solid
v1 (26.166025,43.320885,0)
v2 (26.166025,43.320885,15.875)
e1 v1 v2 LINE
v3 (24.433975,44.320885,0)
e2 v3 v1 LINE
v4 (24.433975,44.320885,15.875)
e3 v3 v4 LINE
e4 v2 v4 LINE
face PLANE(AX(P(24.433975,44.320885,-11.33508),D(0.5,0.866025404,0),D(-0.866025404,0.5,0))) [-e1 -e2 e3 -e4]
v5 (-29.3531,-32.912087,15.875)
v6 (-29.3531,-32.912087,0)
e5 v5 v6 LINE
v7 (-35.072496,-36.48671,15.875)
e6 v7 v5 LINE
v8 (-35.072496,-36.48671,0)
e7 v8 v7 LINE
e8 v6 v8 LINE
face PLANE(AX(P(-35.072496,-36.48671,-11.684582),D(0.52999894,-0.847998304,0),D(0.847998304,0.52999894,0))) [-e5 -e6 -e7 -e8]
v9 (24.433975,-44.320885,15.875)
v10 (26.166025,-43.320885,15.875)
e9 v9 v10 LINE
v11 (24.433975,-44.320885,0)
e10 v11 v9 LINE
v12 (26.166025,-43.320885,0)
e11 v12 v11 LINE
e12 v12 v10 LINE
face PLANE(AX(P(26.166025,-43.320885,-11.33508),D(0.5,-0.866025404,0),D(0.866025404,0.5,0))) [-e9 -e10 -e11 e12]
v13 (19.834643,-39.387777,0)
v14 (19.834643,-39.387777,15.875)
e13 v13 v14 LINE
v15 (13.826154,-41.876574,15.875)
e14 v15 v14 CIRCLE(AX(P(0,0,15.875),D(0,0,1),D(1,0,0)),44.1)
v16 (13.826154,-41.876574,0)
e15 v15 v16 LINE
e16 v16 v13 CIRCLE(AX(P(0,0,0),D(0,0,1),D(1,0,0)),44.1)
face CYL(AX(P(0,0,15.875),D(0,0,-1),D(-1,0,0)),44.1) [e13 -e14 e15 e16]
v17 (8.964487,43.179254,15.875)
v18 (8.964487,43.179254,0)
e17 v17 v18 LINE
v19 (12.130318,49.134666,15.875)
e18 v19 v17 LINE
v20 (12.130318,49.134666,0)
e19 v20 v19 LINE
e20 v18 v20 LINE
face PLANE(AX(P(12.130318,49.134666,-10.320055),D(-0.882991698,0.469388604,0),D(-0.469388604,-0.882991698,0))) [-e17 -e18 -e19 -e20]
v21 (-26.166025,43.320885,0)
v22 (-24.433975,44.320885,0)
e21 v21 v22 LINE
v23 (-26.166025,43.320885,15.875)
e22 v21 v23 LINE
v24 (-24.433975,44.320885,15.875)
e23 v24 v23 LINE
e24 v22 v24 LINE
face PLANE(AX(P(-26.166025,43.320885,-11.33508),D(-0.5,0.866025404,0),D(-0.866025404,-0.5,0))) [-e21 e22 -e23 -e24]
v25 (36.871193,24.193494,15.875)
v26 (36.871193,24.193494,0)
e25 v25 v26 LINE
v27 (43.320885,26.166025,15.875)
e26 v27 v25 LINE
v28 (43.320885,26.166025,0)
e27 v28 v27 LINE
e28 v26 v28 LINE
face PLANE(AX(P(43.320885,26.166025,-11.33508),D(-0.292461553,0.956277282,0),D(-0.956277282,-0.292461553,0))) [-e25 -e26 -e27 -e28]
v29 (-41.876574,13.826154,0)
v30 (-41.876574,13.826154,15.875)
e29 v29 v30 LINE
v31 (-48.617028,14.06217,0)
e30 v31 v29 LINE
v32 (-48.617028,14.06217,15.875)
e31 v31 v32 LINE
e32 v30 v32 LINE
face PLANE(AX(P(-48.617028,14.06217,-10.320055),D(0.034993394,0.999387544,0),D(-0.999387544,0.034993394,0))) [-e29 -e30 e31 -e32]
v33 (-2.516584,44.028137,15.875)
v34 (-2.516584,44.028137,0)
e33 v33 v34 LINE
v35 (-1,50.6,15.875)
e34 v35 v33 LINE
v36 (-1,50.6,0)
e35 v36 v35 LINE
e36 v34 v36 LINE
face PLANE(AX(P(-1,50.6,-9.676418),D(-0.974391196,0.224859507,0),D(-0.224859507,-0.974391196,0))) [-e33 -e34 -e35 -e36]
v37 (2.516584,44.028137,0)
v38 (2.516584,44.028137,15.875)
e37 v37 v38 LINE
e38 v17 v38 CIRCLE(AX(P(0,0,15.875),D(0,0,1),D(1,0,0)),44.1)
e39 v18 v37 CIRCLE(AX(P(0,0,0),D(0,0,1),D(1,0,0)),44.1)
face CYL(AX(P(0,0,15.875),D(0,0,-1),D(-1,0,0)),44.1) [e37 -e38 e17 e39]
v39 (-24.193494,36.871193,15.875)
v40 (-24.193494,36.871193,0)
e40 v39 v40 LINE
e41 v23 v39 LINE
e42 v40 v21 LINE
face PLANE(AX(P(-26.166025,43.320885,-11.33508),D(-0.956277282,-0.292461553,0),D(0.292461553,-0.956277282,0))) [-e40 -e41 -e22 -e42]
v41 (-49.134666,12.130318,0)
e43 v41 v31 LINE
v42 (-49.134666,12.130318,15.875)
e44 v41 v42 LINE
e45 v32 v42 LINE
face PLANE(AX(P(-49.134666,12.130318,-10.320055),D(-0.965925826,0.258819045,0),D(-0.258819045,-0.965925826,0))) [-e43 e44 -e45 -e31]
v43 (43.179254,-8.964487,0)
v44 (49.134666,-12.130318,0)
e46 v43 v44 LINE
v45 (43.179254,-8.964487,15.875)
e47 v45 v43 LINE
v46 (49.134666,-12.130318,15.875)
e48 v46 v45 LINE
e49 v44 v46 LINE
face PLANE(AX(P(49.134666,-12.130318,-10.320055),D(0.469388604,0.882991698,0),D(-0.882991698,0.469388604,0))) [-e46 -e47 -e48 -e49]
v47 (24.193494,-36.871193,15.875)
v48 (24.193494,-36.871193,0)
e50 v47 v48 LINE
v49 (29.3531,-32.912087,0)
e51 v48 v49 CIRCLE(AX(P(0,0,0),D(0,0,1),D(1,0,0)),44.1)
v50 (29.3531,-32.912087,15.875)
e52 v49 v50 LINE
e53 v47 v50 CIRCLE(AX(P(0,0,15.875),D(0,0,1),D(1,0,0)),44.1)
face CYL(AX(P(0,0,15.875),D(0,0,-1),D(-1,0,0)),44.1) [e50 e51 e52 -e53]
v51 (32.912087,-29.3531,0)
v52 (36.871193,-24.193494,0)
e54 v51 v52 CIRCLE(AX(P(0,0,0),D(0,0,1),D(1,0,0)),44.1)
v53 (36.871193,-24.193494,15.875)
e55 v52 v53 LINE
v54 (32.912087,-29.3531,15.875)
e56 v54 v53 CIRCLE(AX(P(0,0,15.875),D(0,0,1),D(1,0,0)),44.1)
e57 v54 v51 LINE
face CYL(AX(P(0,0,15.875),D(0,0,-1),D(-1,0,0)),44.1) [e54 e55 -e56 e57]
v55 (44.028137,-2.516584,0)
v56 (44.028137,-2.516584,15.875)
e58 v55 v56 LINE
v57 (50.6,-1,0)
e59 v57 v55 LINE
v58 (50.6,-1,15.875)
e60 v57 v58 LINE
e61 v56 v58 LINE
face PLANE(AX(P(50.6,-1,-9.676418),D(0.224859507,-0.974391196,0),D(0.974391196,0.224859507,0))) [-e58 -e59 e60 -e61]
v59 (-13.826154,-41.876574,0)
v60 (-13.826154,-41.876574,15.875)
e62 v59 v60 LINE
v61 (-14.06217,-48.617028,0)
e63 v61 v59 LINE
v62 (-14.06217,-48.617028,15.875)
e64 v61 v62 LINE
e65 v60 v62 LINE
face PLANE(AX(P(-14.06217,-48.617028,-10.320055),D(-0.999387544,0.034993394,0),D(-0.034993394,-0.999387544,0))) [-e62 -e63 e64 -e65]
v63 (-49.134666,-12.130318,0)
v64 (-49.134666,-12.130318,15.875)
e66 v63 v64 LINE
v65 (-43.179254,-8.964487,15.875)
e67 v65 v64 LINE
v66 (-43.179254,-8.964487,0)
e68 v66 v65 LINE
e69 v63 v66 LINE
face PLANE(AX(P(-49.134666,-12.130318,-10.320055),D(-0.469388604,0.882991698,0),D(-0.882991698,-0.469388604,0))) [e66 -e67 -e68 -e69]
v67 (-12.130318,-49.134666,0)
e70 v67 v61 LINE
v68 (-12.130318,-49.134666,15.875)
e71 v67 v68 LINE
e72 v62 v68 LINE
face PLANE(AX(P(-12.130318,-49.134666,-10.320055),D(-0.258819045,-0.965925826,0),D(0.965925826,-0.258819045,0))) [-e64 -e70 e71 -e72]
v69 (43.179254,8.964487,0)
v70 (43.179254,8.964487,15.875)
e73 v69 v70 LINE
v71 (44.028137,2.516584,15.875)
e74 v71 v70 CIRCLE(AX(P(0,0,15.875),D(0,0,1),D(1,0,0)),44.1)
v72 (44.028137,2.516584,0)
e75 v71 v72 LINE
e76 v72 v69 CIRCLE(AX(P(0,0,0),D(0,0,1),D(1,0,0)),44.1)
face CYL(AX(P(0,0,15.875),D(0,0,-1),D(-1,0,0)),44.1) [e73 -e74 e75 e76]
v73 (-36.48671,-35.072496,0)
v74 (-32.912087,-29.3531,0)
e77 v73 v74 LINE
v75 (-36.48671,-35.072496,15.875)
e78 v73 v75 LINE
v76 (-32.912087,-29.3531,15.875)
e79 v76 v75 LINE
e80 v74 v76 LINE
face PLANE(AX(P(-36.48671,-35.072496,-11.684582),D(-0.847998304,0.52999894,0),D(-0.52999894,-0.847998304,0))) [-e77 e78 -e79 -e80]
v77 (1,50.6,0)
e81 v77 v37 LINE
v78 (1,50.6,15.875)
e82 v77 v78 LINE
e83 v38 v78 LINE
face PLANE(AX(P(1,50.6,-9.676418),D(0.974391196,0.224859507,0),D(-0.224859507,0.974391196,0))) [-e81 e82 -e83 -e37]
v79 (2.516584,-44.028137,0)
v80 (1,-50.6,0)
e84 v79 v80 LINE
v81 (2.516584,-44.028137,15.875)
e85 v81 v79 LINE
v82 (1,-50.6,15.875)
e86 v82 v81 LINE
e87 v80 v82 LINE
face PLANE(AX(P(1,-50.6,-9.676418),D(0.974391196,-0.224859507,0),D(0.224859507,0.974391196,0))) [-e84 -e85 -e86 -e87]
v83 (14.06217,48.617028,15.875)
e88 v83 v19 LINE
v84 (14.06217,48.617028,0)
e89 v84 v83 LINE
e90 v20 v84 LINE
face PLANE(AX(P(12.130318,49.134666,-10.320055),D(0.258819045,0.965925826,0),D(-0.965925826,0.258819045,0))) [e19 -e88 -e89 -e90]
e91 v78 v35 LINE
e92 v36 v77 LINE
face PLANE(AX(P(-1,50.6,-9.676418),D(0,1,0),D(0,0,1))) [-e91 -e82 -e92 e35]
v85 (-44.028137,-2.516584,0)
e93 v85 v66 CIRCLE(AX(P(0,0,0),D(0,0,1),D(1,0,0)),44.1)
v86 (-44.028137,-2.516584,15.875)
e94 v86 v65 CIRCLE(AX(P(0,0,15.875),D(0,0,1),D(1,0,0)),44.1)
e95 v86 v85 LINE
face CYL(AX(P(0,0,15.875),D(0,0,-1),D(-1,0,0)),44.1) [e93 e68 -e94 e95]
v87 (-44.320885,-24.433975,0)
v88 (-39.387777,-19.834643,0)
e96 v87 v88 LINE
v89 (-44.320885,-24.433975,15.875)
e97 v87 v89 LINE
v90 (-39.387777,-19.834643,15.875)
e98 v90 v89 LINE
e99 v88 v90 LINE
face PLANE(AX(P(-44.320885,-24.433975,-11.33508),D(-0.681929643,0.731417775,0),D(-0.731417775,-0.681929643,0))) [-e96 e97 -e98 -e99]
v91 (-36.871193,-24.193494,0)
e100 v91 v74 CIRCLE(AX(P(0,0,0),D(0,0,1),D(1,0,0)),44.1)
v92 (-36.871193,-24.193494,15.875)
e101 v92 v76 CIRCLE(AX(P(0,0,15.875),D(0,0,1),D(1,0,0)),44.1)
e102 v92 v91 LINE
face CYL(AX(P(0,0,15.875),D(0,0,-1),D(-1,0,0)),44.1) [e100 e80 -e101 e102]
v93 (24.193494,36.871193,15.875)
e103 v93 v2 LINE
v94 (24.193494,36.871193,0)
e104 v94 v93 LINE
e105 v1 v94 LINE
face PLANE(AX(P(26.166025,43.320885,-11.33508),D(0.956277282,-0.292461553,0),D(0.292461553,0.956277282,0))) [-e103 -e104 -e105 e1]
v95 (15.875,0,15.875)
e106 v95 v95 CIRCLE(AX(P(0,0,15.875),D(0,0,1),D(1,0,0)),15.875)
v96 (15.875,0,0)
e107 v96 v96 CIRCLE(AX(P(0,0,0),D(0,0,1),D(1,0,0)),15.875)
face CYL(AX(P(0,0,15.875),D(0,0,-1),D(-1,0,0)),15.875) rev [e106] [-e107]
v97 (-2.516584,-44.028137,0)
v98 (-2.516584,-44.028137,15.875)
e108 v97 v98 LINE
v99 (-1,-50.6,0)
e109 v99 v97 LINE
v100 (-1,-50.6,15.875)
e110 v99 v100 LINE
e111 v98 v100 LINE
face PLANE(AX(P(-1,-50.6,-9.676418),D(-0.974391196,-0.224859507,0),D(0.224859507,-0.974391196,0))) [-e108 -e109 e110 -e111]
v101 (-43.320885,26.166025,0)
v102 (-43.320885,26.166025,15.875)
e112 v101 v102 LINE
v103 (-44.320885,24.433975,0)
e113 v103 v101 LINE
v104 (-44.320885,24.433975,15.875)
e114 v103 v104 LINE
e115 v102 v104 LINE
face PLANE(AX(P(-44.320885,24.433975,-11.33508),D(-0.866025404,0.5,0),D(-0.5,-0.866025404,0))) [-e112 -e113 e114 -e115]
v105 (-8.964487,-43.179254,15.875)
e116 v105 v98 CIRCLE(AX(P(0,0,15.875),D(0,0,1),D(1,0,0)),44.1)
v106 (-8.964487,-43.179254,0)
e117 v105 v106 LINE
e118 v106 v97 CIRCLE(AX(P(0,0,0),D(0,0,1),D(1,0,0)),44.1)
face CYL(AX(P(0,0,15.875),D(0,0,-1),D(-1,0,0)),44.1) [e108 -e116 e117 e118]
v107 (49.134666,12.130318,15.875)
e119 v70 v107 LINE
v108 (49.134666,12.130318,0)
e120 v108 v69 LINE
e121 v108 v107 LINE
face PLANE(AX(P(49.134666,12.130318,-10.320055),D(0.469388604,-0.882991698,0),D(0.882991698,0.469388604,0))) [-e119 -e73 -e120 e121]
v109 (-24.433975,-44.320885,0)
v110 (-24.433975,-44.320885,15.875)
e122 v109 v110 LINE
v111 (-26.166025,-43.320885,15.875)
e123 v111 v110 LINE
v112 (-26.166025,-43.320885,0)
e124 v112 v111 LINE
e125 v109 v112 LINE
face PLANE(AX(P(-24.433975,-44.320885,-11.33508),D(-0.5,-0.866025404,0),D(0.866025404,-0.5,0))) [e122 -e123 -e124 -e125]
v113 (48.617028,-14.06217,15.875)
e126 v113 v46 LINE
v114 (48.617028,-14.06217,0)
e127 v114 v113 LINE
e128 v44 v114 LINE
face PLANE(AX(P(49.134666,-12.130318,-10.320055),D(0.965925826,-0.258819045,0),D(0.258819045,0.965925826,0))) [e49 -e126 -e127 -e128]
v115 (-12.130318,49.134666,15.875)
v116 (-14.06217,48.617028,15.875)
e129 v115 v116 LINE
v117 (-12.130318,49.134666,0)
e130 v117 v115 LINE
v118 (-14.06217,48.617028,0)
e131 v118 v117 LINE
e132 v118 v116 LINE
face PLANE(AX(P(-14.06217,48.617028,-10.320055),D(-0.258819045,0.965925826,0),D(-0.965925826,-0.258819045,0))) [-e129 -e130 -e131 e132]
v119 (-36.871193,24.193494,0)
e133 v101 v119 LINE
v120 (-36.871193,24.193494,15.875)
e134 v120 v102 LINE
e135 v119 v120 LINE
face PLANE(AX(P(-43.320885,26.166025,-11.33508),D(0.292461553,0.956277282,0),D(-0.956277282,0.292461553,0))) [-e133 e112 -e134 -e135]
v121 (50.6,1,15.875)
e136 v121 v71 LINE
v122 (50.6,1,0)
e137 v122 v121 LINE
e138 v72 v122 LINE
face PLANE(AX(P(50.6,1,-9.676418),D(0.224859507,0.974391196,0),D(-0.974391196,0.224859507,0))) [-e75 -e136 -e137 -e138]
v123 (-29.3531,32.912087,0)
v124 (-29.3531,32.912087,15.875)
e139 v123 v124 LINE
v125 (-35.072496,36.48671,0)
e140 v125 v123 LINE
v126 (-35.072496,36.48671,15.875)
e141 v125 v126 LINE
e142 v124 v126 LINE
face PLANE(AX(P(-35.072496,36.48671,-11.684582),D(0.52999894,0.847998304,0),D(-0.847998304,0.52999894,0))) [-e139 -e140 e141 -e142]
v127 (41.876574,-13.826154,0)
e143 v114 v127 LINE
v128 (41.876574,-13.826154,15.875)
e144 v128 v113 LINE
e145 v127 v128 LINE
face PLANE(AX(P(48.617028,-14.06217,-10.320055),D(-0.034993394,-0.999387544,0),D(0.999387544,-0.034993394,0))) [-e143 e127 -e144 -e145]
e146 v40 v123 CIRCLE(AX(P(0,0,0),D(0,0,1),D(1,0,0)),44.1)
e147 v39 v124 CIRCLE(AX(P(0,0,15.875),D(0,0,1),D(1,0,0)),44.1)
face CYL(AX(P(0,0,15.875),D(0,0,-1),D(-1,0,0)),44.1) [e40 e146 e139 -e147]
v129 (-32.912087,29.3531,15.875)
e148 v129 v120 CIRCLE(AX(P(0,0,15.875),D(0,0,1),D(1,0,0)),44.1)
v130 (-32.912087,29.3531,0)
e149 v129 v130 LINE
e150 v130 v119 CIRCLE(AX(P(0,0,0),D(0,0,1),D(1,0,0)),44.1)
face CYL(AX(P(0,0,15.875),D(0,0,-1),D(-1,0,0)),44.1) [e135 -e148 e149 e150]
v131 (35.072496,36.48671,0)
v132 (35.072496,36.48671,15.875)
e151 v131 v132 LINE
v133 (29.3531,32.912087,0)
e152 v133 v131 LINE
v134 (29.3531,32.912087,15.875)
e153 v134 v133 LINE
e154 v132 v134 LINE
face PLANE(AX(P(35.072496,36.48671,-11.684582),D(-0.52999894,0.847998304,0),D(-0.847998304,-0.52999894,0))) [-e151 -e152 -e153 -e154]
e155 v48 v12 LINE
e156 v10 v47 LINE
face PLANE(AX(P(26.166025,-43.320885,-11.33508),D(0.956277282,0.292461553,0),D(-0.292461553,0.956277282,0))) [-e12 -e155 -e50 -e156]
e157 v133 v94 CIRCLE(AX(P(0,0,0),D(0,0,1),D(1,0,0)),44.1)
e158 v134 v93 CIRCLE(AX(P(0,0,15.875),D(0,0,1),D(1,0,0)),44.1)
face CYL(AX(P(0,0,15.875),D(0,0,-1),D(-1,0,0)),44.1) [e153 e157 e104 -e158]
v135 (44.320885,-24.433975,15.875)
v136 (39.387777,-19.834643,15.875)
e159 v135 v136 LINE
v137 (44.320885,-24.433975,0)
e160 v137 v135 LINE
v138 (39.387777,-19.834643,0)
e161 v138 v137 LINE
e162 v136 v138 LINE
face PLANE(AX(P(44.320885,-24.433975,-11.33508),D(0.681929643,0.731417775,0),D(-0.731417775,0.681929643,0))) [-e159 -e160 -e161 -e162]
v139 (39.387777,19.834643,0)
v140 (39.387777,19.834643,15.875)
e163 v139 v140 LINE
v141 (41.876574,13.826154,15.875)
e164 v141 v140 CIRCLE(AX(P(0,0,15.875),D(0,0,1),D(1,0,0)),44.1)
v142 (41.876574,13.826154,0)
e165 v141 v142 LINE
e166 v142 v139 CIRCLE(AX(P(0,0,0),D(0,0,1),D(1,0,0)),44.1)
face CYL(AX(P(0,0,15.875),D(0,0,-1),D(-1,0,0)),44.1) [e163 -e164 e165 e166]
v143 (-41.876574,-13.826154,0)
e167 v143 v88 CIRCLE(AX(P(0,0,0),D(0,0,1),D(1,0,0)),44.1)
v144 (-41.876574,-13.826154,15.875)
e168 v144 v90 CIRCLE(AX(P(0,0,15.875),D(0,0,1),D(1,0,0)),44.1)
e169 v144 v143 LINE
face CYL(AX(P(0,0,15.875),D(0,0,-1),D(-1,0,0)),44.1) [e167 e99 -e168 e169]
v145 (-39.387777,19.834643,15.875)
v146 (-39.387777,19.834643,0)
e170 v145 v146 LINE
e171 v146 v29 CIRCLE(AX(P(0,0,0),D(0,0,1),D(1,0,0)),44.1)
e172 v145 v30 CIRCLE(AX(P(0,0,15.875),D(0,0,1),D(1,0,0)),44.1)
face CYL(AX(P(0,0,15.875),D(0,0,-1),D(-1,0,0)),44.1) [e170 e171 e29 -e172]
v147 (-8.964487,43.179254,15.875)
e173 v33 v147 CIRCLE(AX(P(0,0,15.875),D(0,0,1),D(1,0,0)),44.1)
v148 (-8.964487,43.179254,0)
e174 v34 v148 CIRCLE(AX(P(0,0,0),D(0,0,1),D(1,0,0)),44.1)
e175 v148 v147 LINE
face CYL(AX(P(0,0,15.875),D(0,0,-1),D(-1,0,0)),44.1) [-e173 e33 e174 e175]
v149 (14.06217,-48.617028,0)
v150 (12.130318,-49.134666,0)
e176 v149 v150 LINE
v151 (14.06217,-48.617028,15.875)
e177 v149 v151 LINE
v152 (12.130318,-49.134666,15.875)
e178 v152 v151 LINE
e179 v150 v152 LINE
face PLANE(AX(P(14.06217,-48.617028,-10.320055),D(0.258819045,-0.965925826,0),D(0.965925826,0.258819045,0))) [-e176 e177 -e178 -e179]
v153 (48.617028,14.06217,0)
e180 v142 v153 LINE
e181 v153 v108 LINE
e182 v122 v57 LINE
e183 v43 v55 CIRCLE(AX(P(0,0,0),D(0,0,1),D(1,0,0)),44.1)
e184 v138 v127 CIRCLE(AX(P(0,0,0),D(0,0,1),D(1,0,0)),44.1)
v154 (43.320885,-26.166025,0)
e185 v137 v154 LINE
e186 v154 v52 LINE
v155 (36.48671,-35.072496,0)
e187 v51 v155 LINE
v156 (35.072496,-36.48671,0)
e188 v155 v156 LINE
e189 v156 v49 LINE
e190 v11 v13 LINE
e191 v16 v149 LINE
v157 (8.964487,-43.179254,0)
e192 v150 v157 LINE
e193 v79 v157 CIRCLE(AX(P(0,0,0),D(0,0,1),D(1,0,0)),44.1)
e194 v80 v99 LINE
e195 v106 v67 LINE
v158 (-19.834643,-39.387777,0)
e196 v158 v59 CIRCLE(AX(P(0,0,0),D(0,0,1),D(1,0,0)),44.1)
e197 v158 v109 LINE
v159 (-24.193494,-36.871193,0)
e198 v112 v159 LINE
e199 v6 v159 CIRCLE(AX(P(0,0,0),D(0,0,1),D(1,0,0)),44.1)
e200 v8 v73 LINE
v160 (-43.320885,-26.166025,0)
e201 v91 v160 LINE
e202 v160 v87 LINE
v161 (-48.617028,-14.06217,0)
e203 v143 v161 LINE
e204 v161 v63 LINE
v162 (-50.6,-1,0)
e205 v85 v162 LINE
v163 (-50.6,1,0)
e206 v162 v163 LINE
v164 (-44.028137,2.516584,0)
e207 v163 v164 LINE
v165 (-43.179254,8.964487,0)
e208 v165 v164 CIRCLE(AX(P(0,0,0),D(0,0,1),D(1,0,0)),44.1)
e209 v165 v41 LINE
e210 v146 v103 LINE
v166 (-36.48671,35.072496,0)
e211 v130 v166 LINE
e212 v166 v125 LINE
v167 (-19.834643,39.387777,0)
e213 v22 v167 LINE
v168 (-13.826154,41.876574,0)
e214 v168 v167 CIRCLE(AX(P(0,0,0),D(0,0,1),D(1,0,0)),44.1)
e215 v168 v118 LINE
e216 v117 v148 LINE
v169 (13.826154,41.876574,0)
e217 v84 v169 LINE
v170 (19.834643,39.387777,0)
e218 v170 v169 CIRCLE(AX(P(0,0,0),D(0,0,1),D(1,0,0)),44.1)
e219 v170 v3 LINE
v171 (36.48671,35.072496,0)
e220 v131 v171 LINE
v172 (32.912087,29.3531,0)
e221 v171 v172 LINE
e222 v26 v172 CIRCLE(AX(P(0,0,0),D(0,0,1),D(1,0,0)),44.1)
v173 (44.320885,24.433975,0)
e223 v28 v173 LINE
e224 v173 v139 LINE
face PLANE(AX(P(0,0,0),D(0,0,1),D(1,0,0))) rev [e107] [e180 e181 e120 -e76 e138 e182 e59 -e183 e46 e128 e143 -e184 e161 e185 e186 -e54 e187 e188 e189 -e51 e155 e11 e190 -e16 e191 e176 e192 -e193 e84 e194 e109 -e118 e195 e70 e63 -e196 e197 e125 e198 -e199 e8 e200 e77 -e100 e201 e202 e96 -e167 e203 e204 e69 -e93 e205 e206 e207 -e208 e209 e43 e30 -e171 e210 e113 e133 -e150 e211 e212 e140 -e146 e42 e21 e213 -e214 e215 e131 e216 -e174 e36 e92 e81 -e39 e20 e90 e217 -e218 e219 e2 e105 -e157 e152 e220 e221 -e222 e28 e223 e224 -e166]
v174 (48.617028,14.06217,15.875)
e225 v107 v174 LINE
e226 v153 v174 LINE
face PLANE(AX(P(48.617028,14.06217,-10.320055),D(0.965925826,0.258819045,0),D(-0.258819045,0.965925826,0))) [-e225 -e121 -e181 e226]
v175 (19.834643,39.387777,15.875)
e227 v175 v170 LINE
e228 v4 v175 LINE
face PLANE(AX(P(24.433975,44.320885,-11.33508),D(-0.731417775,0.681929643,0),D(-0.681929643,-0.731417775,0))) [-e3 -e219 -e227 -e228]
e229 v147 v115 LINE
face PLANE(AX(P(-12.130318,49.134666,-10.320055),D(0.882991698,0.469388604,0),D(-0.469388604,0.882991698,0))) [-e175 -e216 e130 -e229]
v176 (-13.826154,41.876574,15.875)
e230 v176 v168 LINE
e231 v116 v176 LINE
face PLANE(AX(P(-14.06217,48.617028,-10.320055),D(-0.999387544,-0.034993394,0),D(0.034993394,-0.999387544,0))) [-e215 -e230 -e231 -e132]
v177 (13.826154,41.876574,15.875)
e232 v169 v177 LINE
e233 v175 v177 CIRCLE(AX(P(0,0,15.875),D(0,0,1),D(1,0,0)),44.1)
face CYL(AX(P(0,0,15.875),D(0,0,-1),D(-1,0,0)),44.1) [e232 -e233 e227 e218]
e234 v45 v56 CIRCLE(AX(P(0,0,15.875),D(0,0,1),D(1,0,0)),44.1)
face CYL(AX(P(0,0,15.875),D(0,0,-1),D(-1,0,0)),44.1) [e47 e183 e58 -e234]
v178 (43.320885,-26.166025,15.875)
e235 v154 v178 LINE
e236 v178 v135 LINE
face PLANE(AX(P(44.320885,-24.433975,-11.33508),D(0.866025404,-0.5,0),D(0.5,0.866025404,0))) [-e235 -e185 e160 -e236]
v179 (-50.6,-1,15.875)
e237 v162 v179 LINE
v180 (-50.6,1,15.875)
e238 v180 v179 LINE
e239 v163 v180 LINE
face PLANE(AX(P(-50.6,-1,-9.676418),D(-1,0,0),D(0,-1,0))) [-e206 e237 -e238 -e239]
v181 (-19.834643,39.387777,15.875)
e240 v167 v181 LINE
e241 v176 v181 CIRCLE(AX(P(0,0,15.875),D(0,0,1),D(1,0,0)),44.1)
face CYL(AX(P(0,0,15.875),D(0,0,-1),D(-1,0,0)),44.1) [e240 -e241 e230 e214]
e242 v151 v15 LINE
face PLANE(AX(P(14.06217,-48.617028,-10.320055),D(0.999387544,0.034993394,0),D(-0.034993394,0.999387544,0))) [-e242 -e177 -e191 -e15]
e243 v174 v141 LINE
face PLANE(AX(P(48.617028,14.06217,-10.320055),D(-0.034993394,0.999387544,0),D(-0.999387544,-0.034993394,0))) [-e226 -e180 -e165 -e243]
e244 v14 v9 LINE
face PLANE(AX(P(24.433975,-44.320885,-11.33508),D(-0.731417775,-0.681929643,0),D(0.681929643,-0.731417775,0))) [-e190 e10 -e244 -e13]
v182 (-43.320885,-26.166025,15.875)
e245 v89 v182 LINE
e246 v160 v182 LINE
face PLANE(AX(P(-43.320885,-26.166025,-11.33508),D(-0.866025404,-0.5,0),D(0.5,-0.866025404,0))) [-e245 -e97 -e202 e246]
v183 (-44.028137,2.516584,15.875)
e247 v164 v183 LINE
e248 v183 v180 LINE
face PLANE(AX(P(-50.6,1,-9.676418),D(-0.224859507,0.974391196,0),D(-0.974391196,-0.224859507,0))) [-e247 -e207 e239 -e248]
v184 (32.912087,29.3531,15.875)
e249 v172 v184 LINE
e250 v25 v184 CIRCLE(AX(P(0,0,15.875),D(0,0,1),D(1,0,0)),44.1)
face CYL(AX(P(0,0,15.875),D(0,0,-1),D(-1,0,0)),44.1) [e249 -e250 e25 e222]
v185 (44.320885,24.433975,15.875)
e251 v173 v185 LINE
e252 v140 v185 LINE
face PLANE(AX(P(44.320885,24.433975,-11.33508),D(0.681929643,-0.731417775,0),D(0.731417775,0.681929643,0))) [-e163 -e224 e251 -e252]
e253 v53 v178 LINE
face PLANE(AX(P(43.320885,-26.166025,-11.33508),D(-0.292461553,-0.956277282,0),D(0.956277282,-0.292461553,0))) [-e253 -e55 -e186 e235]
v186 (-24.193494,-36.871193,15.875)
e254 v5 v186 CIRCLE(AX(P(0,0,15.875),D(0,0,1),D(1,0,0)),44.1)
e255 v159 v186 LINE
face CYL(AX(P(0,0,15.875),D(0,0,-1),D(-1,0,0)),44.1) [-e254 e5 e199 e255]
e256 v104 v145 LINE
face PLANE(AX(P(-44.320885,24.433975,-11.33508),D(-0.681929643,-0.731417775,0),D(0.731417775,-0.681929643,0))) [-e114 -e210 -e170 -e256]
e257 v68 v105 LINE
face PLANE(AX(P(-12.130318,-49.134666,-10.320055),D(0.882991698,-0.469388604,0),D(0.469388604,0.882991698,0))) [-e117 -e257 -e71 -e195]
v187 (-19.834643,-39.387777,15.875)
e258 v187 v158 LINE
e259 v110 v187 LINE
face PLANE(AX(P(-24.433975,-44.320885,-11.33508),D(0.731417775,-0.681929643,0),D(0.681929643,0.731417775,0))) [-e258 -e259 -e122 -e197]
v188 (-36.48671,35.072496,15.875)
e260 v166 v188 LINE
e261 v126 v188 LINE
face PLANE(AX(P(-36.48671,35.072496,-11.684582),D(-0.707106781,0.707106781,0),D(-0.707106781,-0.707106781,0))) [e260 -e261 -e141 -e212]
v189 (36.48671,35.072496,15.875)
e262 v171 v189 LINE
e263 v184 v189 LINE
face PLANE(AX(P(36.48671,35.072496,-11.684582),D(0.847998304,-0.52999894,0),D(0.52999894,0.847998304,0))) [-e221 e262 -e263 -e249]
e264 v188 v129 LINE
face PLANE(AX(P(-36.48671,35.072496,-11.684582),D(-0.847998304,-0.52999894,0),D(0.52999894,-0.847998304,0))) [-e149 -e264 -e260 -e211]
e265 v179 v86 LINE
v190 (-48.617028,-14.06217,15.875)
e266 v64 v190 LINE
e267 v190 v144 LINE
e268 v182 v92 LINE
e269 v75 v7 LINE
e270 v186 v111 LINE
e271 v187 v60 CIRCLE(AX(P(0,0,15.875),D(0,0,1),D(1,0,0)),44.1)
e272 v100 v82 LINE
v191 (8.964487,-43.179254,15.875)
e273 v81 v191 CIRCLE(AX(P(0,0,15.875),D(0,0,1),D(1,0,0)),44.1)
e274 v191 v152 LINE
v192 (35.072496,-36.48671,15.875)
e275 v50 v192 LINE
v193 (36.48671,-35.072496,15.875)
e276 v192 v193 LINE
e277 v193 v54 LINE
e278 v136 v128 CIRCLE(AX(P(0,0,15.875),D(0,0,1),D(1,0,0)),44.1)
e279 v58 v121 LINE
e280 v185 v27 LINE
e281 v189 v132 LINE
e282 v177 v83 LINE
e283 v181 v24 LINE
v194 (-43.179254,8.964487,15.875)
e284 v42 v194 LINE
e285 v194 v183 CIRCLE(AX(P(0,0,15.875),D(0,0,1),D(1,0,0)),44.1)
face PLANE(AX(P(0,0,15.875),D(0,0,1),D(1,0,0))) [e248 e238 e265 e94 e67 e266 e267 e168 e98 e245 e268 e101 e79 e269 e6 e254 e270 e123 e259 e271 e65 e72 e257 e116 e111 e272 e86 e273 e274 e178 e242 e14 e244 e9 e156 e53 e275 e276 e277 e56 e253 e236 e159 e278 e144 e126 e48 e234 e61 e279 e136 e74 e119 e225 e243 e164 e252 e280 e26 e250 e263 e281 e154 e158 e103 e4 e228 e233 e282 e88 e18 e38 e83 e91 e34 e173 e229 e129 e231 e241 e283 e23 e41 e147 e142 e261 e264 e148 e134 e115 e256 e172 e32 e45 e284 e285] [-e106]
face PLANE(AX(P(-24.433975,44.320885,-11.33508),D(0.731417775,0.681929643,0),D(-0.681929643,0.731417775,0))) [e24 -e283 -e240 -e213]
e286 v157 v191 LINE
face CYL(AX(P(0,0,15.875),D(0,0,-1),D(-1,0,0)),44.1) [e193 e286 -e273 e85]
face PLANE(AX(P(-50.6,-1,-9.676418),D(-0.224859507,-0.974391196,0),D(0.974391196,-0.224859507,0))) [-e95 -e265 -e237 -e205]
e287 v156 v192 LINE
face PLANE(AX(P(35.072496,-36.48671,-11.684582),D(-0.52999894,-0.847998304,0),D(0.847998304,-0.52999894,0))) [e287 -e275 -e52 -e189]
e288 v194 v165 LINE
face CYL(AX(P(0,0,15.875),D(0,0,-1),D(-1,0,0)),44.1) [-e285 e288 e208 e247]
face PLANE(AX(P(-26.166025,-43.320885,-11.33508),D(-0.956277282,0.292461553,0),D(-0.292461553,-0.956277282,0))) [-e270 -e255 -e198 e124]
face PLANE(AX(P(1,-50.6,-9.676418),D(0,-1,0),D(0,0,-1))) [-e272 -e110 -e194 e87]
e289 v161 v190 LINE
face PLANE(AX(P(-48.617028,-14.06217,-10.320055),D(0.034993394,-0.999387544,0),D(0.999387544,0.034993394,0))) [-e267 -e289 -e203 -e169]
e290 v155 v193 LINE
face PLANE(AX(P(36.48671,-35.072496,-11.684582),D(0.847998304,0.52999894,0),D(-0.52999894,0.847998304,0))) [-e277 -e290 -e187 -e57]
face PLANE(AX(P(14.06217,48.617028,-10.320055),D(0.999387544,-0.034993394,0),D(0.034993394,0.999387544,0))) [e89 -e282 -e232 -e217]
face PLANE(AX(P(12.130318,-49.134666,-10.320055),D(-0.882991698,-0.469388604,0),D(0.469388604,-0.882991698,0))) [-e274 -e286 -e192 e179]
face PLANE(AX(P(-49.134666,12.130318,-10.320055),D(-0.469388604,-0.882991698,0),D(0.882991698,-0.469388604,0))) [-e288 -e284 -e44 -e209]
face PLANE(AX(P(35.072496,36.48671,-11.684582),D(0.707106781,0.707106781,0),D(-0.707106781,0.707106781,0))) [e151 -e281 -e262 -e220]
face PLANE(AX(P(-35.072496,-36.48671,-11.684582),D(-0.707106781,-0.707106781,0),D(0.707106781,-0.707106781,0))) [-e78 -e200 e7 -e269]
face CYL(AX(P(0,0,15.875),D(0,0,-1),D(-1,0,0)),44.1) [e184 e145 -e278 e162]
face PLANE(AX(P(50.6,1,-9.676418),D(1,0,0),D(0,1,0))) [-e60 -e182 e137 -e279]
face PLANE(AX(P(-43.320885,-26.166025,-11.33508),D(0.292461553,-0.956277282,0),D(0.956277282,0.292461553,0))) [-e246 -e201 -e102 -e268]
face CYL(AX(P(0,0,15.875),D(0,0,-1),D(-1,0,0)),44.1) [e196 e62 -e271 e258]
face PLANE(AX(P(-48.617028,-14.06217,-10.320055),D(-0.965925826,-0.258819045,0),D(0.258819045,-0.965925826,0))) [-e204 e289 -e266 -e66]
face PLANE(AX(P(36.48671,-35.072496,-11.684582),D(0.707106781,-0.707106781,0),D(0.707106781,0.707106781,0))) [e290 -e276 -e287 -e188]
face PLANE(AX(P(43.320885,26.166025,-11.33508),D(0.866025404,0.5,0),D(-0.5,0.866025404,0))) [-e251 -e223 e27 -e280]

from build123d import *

# Parameters (mm, degrees)
CROQUIS1_R              = 44.1
CROQUIS1_R_2            = 15.875
SALIENTE_EXTRUIR1_DEPTH = 15.875
SALIENTE_EXTRUIR2_DEPTH = 15.875
MATRIZC1_DEPTH          = 15.875


# Read off the part's stored shape, not the designer's step: MatrizC1
with BuildPart() as part:
    # Croquis1 → Saliente-Extruir1 (new body)
    with BuildSketch(Plane.XY):
        Circle(CROQUIS1_R)
        Circle(CROQUIS1_R_2, mode=Mode.SUBTRACT)
    extrude(amount=SALIENTE_EXTRUIR1_DEPTH)

    # Croquis2 → Saliente-Extruir2 (add)
    with BuildSketch(Plane.XY.offset(15.875)):
        Polygon((-1, 50.6), (1, 50.6), (2.815859205, 42.731276779), (-2.815859205, 42.731276779), align=None)
    extrude(amount=-SALIENTE_EXTRUIR2_DEPTH)

    # MatrizC1 outline → MatrizC1 (add)
    with BuildSketch(Plane.XY):
        with BuildLine():
            ThreePointArc((-13.826153616, 41.876574313), (-11.413919889, 42.59732894), (-8.964486889, 43.179253987))
            Line((-8.964486889, 43.179253987), (-12.130317856, 49.134665855))
            Line((-12.130317856, 49.134665855), (-14.062169508, 48.617027765))
            Line((-14.062169508, 48.617027765), (-13.826153616, 41.876574313))
        make_face()
        with BuildLine():
            ThreePointArc((8.964486889, 43.179253987), (11.413919889, 42.59732894), (13.826153616, 41.876574313))
            Line((13.826153616, 41.876574313), (14.062169508, 48.617027765))
            Line((14.062169508, 48.617027765), (12.130317856, 49.134665855))
            Line((12.130317856, 49.134665855), (8.964486889, 43.179253987))
        make_face()
        with BuildLine():
            ThreePointArc((19.83464269, 39.387776649), (22.05, 38.191720307), (24.193493831, 36.87119277))
            Line((24.193493831, 36.87119277), (26.166025404, 43.320885431))
            Line((26.166025404, 43.320885431), (24.433974596, 44.320885431))
            Line((24.433974596, 44.320885431), (19.83464269, 39.387776649))
        make_face()
        with BuildLine():
            ThreePointArc((29.353100371, 32.912087424), (31.18340905, 31.18340905), (32.912087424, 29.353100371))
            Line((32.912087424, 29.353100371), (36.486709909, 35.072496347))
            Line((36.486709909, 35.072496347), (35.072496347, 36.486709909))
            Line((35.072496347, 36.486709909), (29.353100371, 32.912087424))
        make_face()
        with BuildLine():
            ThreePointArc((36.87119277, 24.193493831), (38.191720307, 22.05), (39.387776649, 19.83464269))
            Line((39.387776649, 19.83464269), (44.320885431, 24.433974596))
            Line((44.320885431, 24.433974596), (43.320885431, 26.166025404))
            Line((43.320885431, 26.166025404), (36.87119277, 24.193493831))
        make_face()
        with BuildLine():
            ThreePointArc((41.876574313, 13.826153616), (42.597328939, 11.413919889), (43.179253986, 8.964486889))
            Line((43.179253986, 8.964486889), (49.134665855, 12.130317856))
            Line((49.134665855, 12.130317856), (48.617027765, 14.062169508))
            Line((48.617027765, 14.062169508), (41.876574313, 13.826153616))
        make_face()
        with BuildLine():
            ThreePointArc((44.028136522, 2.51658388), (44.1, 0), (44.028136522, -2.51658388))
            Line((44.028136522, -2.51658388), (50.6, -1))
            Line((50.6, -1), (50.6, 1))
            Line((50.6, 1), (44.028136522, 2.51658388))
        make_face()
        with BuildLine():
            ThreePointArc((43.179253986, -8.964486889), (42.597328939, -11.413919889), (41.876574313, -13.826153616))
            Line((41.876574313, -13.826153616), (48.617027765, -14.062169508))
            Line((48.617027765, -14.062169508), (49.134665855, -12.130317856))
            Line((49.134665855, -12.130317856), (43.179253986, -8.964486889))
        make_face()
        with BuildLine():
            ThreePointArc((39.387776649, -19.83464269), (38.191720307, -22.05), (36.871192769, -24.193493831))
            Line((36.871192769, -24.193493831), (43.320885431, -26.166025404))
            Line((43.320885431, -26.166025404), (44.320885431, -24.433974596))
            Line((44.320885431, -24.433974596), (39.387776649, -19.83464269))
        make_face()
        with BuildLine():
            ThreePointArc((32.912087424, -29.353100371), (31.18340905, -31.18340905), (29.353100371, -32.912087424))
            Line((29.353100371, -32.912087424), (35.072496347, -36.486709909))
            Line((35.072496347, -36.486709909), (36.486709909, -35.072496347))
            Line((36.486709909, -35.072496347), (32.912087424, -29.353100371))
        make_face()
        with BuildLine():
            ThreePointArc((24.193493831, -36.871192769), (22.05, -38.191720307), (19.83464269, -39.387776649))
            Line((19.83464269, -39.387776649), (24.433974596, -44.320885431))
            Line((24.433974596, -44.320885431), (26.166025404, -43.320885431))
            Line((26.166025404, -43.320885431), (24.193493831, -36.871192769))
        make_face()
        with BuildLine():
            ThreePointArc((13.826153616, -41.876574313), (11.413919889, -42.597328939), (8.964486889, -43.179253986))
            Line((8.964486889, -43.179253986), (12.130317856, -49.134665855))
            Line((12.130317856, -49.134665855), (14.062169508, -48.617027765))
            Line((14.062169508, -48.617027765), (13.826153616, -41.876574313))
        make_face()
        with BuildLine():
            ThreePointArc((2.51658388, -44.028136522), (0, -44.1), (-2.51658388, -44.028136522))
            Line((-2.51658388, -44.028136522), (-1, -50.6))
            Line((-1, -50.6), (1, -50.6))
            Line((1, -50.6), (2.51658388, -44.028136522))
        make_face()
        with BuildLine():
            ThreePointArc((-8.964486889, -43.179253986), (-11.413919889, -42.597328939), (-13.826153616, -41.876574313))
            Line((-13.826153616, -41.876574313), (-14.062169508, -48.617027765))
            Line((-14.062169508, -48.617027765), (-12.130317856, -49.134665855))
            Line((-12.130317856, -49.134665855), (-8.964486889, -43.179253986))
        make_face()
        with BuildLine():
            ThreePointArc((-19.83464269, -39.387776649), (-22.05, -38.191720307), (-24.193493831, -36.871192769))
            Line((-24.193493831, -36.871192769), (-26.166025404, -43.320885431))
            Line((-26.166025404, -43.320885431), (-24.433974596, -44.320885431))
            Line((-24.433974596, -44.320885431), (-19.83464269, -39.387776649))
        make_face()
        with BuildLine():
            ThreePointArc((-29.353100371, -32.912087424), (-31.18340905, -31.18340905), (-32.912087424, -29.353100371))
            Line((-32.912087424, -29.353100371), (-36.486709909, -35.072496347))
            Line((-36.486709909, -35.072496347), (-35.072496347, -36.486709909))
            Line((-35.072496347, -36.486709909), (-29.353100371, -32.912087424))
        make_face()
        with BuildLine():
            ThreePointArc((-36.871192769, -24.193493831), (-38.191720307, -22.05), (-39.387776649, -19.83464269))
            Line((-39.387776649, -19.83464269), (-44.320885431, -24.433974596))
            Line((-44.320885431, -24.433974596), (-43.320885431, -26.166025404))
            Line((-43.320885431, -26.166025404), (-36.871192769, -24.193493831))
        make_face()
        with BuildLine():
            ThreePointArc((-41.876574313, -13.826153616), (-42.597328939, -11.413919889), (-43.179253986, -8.964486889))
            Line((-43.179253986, -8.964486889), (-49.134665855, -12.130317856))
            Line((-49.134665855, -12.130317856), (-48.617027765, -14.062169508))
            Line((-48.617027765, -14.062169508), (-41.876574313, -13.826153616))
        make_face()
        with BuildLine():
            ThreePointArc((-44.028136522, -2.51658388), (-44.1, 0), (-44.028136522, 2.51658388))
            Line((-44.028136522, 2.51658388), (-50.6, 1))
            Line((-50.6, 1), (-50.6, -1))
            Line((-50.6, -1), (-44.028136522, -2.51658388))
        make_face()
        with BuildLine():
            ThreePointArc((-43.179253986, 8.964486889), (-42.597328939, 11.413919889), (-41.876574313, 13.826153616))
            Line((-41.876574313, 13.826153616), (-48.617027765, 14.062169508))
            Line((-48.617027765, 14.062169508), (-49.134665855, 12.130317856))
            Line((-49.134665855, 12.130317856), (-43.179253986, 8.964486889))
        make_face()
        with BuildLine():
            ThreePointArc((-39.387776649, 19.83464269), (-38.191720307, 22.05), (-36.87119277, 24.193493831))
            Line((-36.87119277, 24.193493831), (-43.320885431, 26.166025404))
            Line((-43.320885431, 26.166025404), (-44.320885431, 24.433974596))
            Line((-44.320885431, 24.433974596), (-39.387776649, 19.83464269))
        make_face()
        with BuildLine():
            ThreePointArc((-32.912087424, 29.353100371), (-31.18340905, 31.18340905), (-29.353100371, 32.912087424))
            Line((-29.353100371, 32.912087424), (-35.072496347, 36.486709909))
            Line((-35.072496347, 36.486709909), (-36.486709909, 35.072496347))
            Line((-36.486709909, 35.072496347), (-32.912087424, 29.353100371))
        make_face()
        with BuildLine():
            ThreePointArc((-24.193493831, 36.87119277), (-22.05, 38.191720307), (-19.83464269, 39.387776649))
            Line((-19.83464269, 39.387776649), (-24.433974596, 44.320885431))
            Line((-24.433974596, 44.320885431), (-26.166025404, 43.320885431))
            Line((-26.166025404, 43.320885431), (-24.193493831, 36.87119277))
        make_face()
    extrude(amount=MATRIZC1_DEPTH)


solid = part.part
